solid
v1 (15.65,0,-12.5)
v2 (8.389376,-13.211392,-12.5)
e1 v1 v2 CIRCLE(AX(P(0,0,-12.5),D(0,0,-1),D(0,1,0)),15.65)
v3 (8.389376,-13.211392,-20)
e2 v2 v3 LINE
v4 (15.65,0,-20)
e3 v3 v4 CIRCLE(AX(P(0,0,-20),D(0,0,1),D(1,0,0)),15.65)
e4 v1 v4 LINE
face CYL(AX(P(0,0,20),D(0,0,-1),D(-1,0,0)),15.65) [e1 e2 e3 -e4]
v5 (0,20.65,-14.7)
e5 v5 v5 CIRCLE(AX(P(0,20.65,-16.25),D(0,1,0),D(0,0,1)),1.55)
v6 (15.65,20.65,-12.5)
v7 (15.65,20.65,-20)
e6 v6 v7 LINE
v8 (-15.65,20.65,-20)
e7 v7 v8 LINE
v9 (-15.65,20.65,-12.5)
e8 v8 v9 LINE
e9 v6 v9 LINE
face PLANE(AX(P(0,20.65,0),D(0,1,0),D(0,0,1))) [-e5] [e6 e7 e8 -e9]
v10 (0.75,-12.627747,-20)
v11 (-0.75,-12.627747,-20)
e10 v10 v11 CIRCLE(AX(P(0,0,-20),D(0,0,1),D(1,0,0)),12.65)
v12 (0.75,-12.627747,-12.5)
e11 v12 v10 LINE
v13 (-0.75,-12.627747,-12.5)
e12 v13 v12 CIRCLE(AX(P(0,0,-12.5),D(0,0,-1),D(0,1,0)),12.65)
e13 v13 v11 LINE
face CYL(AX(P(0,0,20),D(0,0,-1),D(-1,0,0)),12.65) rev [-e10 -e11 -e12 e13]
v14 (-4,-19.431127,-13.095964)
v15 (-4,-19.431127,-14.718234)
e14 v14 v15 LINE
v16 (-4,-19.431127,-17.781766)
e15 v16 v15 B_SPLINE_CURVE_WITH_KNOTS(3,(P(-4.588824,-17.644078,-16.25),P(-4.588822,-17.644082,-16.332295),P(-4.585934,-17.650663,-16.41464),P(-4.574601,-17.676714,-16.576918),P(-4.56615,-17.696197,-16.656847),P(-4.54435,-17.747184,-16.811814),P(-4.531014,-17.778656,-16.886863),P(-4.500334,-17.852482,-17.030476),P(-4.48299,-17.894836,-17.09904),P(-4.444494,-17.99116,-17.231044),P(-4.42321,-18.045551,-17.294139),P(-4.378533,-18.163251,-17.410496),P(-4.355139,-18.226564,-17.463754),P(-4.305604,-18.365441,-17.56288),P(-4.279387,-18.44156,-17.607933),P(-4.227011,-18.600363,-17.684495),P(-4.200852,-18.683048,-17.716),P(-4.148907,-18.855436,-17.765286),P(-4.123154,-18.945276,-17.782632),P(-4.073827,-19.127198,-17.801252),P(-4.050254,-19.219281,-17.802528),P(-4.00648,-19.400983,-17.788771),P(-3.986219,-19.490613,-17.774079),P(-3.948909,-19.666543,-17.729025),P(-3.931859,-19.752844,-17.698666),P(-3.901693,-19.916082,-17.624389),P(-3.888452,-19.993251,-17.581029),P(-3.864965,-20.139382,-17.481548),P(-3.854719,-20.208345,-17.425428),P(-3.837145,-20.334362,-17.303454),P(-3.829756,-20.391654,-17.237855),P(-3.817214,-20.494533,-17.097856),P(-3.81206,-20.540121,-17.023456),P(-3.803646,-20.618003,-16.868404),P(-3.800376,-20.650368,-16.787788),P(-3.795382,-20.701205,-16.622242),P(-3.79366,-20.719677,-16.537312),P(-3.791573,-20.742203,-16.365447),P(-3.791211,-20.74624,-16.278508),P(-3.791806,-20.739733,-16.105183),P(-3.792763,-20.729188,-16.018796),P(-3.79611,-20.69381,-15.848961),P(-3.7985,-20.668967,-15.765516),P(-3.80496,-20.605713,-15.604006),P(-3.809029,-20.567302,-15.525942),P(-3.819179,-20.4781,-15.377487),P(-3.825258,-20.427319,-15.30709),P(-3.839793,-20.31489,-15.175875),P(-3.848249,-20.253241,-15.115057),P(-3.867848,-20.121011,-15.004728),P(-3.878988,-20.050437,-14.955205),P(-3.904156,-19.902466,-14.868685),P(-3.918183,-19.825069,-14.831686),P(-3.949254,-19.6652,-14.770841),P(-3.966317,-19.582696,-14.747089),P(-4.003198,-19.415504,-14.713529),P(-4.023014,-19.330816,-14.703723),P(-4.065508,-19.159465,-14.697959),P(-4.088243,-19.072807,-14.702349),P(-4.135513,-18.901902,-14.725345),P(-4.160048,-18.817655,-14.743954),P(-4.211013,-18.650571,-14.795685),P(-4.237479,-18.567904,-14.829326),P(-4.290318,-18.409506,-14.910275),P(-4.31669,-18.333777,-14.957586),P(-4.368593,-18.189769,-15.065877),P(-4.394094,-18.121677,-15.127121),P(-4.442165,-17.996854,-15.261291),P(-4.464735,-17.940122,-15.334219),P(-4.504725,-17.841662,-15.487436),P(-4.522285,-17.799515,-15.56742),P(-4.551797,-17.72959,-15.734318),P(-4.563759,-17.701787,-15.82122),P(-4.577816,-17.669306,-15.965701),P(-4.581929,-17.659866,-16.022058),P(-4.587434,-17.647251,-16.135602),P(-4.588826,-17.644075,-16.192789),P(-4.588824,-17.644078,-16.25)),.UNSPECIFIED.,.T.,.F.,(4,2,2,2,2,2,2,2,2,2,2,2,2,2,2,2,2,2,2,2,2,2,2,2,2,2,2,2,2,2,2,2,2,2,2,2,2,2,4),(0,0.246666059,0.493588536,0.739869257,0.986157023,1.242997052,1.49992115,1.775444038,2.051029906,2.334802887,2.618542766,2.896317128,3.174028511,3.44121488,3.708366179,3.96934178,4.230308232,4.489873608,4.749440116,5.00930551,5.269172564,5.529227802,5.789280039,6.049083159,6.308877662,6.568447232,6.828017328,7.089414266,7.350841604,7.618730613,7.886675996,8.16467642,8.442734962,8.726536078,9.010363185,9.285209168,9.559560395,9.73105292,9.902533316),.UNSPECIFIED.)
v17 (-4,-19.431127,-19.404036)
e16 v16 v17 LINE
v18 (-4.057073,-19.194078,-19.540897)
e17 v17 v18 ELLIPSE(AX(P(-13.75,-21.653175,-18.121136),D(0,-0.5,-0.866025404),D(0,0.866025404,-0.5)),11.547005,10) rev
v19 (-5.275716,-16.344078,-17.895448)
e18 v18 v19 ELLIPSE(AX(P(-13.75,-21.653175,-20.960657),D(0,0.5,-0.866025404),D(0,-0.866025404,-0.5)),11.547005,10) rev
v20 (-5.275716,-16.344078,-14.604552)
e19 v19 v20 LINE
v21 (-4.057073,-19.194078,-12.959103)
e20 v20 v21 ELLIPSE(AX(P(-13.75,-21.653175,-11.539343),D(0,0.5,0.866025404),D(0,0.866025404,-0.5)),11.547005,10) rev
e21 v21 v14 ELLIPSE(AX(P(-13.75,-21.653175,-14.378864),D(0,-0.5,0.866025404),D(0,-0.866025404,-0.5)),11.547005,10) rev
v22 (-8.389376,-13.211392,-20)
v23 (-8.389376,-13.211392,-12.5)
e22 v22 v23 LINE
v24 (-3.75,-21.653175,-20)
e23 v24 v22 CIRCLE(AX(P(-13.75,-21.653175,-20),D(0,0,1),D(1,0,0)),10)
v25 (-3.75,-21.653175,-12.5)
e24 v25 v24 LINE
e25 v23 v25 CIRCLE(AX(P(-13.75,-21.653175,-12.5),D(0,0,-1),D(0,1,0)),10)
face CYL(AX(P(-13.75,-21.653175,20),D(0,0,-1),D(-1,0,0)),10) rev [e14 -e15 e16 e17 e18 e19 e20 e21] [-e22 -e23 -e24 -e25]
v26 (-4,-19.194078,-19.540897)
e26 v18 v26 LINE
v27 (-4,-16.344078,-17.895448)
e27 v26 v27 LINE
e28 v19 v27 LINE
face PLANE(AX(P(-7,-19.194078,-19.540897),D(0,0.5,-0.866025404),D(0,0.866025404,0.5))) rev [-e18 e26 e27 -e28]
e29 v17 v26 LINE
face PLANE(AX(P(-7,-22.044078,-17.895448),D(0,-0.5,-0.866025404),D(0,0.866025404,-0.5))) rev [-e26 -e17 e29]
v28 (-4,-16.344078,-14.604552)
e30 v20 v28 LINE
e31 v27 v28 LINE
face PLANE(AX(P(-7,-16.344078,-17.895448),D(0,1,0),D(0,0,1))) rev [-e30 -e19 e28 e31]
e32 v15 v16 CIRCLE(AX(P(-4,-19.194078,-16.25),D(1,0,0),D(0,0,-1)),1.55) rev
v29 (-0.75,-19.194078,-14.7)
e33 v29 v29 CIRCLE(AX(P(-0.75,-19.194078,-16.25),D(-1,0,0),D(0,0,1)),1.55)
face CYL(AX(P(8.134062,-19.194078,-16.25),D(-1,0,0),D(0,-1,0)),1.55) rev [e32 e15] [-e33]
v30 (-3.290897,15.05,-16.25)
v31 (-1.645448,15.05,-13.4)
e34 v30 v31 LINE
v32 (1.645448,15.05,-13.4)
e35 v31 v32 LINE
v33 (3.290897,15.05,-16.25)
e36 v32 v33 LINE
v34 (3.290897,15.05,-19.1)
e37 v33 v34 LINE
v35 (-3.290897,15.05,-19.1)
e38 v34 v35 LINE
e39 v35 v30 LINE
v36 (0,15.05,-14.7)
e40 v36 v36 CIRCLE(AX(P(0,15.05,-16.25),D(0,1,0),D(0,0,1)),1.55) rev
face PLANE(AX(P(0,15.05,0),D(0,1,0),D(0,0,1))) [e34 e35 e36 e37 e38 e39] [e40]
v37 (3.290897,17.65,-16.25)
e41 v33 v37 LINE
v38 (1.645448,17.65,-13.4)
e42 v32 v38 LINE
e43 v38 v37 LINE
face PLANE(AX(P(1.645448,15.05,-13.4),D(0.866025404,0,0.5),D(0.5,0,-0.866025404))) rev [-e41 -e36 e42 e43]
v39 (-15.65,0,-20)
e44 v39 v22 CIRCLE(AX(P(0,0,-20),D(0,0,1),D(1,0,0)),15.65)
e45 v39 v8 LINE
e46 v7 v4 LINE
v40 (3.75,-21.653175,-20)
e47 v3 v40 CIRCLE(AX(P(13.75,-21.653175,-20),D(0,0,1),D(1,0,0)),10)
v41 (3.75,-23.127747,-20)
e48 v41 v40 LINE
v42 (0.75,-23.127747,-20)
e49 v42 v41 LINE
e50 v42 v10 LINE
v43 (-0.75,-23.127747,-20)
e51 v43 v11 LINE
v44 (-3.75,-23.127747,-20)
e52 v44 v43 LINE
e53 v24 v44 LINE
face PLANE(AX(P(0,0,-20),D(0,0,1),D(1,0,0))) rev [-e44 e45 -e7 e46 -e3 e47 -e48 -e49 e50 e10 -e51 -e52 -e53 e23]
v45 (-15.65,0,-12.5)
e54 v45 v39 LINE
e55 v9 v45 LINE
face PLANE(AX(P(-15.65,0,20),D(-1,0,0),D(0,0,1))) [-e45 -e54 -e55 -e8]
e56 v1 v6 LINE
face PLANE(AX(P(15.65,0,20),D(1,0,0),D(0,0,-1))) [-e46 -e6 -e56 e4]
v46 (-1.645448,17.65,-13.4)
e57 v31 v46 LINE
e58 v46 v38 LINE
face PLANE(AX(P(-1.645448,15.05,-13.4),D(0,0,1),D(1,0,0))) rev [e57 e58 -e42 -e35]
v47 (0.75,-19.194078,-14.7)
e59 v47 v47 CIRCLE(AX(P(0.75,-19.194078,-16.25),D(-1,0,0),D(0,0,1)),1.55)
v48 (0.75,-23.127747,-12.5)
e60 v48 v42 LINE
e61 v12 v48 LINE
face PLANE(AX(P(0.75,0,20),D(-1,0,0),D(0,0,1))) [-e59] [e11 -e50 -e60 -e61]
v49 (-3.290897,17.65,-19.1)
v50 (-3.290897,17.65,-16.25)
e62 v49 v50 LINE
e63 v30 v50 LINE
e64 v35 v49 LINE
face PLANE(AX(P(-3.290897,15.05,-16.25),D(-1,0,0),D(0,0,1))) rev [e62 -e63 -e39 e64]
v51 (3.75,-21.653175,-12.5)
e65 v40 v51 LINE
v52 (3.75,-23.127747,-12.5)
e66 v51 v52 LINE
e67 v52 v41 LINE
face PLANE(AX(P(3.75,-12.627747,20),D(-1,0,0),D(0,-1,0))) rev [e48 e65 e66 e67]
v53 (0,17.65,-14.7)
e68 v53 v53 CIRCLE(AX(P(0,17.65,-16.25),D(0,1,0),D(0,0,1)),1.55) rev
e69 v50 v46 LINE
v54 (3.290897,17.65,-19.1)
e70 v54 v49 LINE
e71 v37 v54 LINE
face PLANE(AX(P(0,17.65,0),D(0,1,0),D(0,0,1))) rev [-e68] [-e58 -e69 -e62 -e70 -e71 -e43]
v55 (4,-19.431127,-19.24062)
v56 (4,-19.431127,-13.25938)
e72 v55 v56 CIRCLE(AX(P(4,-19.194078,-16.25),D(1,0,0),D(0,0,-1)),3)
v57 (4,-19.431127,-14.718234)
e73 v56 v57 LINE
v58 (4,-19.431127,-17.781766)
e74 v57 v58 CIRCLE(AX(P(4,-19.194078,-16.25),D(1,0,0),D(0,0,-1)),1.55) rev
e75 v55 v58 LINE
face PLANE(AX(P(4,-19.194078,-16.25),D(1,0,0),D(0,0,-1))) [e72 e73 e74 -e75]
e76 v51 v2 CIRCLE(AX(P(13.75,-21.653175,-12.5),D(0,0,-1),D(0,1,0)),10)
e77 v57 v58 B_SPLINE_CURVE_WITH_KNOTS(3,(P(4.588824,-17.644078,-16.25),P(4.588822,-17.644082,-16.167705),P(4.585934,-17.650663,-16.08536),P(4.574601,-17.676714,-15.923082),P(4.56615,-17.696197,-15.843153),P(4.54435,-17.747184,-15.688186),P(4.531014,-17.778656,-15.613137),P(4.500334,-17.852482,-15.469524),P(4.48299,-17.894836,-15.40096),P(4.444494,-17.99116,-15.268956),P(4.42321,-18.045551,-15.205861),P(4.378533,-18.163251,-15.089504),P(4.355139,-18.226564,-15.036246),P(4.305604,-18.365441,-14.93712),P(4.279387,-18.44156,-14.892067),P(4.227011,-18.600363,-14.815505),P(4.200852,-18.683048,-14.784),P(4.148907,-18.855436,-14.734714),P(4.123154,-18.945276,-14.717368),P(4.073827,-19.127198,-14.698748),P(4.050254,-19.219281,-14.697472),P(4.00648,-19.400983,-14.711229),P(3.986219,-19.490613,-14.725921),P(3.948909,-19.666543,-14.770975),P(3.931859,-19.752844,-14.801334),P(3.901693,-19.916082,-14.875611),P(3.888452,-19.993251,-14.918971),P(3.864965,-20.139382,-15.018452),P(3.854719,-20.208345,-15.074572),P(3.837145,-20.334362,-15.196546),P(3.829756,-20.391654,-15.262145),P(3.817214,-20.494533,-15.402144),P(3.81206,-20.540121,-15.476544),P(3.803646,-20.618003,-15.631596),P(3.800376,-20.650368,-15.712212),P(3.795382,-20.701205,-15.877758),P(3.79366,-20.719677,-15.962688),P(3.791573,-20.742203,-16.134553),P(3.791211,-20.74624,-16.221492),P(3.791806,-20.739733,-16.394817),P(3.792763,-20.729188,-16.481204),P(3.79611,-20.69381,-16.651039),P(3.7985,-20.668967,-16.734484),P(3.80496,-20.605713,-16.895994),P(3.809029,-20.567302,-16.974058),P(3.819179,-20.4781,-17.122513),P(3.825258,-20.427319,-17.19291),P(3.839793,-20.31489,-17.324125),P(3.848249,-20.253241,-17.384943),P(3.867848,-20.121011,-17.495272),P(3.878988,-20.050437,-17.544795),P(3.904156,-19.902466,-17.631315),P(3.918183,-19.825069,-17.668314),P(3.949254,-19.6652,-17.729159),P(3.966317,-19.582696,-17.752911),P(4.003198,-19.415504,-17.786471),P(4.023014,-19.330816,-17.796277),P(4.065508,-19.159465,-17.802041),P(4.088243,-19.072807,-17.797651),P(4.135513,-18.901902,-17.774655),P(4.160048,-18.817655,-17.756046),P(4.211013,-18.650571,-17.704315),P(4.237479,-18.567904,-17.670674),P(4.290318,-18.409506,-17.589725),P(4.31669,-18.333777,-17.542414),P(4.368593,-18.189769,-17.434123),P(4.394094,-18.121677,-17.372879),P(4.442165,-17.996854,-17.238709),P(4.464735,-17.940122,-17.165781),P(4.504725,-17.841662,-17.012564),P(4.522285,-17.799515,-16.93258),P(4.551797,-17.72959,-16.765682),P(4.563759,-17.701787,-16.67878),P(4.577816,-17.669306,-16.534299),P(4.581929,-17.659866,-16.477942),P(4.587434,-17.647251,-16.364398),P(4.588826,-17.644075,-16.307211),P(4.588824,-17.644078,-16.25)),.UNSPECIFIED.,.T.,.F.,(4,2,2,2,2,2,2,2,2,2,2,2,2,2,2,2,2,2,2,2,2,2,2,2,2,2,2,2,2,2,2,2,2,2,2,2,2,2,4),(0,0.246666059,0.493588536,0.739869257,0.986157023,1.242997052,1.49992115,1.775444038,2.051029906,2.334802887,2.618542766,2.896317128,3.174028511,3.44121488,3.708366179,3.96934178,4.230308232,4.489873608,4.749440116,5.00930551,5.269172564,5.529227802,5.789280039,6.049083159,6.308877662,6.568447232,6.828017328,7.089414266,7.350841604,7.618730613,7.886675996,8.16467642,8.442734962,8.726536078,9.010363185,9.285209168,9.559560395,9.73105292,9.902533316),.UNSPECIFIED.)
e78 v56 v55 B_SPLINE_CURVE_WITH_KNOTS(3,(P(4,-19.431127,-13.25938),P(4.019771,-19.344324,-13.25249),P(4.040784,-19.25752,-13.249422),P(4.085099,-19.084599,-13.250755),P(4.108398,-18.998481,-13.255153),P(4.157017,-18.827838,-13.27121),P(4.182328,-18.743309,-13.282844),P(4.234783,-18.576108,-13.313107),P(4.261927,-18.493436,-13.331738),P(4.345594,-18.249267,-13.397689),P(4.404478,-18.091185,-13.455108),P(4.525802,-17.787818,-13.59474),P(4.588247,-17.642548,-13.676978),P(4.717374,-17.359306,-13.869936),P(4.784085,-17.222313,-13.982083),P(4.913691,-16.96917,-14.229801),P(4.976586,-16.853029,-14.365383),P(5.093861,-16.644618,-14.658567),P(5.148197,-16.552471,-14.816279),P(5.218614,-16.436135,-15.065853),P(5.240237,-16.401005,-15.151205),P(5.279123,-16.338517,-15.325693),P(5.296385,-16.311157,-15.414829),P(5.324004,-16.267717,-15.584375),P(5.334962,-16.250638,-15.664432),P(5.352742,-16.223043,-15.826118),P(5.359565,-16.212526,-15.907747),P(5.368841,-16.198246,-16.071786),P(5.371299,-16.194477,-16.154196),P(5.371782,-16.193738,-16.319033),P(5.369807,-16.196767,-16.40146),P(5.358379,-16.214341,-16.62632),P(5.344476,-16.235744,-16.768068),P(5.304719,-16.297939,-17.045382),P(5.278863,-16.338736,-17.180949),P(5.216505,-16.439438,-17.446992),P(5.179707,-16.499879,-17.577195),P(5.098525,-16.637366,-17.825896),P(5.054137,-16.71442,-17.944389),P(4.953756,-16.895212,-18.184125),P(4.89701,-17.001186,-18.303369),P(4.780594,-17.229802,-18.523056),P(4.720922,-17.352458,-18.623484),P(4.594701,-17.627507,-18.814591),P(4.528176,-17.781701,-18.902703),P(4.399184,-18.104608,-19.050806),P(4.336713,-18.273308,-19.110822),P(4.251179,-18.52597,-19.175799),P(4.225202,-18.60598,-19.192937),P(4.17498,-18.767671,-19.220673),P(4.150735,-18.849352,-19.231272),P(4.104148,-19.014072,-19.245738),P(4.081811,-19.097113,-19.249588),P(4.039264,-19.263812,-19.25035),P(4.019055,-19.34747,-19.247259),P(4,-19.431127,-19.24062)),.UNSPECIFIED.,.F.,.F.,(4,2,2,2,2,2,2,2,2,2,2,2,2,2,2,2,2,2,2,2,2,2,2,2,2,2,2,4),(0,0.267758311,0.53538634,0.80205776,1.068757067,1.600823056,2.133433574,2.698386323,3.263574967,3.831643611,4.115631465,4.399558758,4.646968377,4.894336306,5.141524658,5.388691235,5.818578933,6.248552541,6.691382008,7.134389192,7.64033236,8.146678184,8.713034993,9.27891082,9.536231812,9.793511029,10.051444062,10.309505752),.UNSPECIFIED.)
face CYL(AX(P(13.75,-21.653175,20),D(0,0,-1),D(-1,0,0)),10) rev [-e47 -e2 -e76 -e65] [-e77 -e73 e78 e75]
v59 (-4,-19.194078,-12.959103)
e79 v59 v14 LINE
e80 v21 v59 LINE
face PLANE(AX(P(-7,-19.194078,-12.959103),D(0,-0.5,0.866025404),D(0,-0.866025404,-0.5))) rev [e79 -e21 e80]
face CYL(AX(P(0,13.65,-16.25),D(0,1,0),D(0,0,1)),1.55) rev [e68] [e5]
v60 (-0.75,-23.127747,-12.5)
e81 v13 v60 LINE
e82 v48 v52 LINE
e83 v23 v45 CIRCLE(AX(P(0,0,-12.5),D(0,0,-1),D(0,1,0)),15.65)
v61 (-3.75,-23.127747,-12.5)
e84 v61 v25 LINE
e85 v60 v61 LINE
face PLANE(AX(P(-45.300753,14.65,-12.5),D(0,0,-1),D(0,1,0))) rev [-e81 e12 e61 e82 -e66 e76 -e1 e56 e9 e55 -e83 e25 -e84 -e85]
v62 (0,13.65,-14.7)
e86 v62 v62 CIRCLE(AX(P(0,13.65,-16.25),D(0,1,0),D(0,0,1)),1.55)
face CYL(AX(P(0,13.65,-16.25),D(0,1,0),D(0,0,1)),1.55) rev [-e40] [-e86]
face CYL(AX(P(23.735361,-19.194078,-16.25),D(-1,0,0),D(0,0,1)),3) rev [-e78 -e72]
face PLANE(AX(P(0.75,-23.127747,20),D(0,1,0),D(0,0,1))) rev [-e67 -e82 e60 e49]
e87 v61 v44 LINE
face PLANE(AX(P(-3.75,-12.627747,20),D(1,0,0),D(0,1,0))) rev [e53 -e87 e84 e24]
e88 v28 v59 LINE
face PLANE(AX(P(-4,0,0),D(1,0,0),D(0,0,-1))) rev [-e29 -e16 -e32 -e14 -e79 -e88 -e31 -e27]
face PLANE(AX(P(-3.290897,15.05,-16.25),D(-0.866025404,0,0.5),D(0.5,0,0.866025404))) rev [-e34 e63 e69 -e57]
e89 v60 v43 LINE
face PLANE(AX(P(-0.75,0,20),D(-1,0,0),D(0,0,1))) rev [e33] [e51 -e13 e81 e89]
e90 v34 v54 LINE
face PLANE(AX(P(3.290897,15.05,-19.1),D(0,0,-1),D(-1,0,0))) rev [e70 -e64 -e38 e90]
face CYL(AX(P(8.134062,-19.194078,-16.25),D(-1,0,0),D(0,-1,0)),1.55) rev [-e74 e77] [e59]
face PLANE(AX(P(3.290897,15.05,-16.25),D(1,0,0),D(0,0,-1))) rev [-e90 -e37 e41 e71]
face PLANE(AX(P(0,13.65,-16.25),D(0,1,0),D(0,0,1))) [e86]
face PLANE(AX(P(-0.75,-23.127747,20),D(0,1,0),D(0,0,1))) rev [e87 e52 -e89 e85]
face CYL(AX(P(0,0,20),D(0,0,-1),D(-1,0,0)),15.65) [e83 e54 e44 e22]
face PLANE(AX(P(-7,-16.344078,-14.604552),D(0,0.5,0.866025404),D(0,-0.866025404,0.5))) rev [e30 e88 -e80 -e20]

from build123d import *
from build123d.topology import SkipClean

# Parameters (mm, degrees)
BOSS_EXTRUDE1_DEPTH   = 20
SKETCH2_W             = 3
SKETCH2_H             = 10.5
BOSS_EXTRUDE2_DEPTH   = 20
SKETCH4_W             = 31.3
SKETCH4_H             = 40
BOSS_EXTRUDE3_DEPTH   = 5
SKETCH5_W             = 25
SKETCH5_H             = 37.777747226
CUT_EXTRUDE2_DEPTH    = 13.65
SKETCH6_R             = 1.55
MOTORMOUNTHOLES_DEPTH = 6
CLAMPHOLES_REACH      = 38.211
SKETCH8_R             = 1.55
ENDSTOPPER_DEPTH      = 2
CUT_EXTRUDE7_START    = -15.65
SKETCH10_W            = 25
SKETCH10_H            = 37.777747226
CUT_EXTRUDE7_DEPTH    = 13.65
SKETCH11_W            = 25
SKETCH11_H            = 10.636850541
CUT_EXTRUDE8_DEPTH    = 4
FILLET1_START         = -20
FILLET1_DEPTH         = 2.1999999
FILLET1_START_2       = -14.6999999
FILLET1_2_DEPTH       = 2.1999999
FILLET1_START_3       = 12.5
FILLET1_3_DEPTH       = 2.1999999
FILLET1_START_4       = 17.8000001
FILLET1_4_DEPTH       = 2.1999999
FILLET1_START_5       = -17.8000001
FILLET1_5_DEPTH       = 3.1000002
FILLET1_START_6       = 14.6999999
FILLET1_6_DEPTH       = 3.1000002
FILLET1_START_7       = -8.389376218
FILLET1_7_OUTLINE_R   = 1.55
FILLET1_7_DEPTH       = 16.778752436
SKETCH13_W            = 10
SKETCH13_H            = 10
CUT_EXTRUDE10_REACH   = 40.348
CUT_EXTRUDE10_START   = 4
SKETCH15_R            = 3
CUT_EXTRUDE11_START   = -4
CUT_EXTRUDE11_DEPTH   = 3
SKETCH17_R            = 6
SHAFT_CLEARANCE_DEPTH = 0.4
SKETCH18_W            = 60.470736223
SKETCH18_H            = 67.356637863
CUT_EXTRUDE12_DEPTH   = 25
SKETCH19_R            = 1.55
CUT_EXTRUDE13_DEPTH   = 7
CUT_EXTRUDE14_START   = -3
CUT_EXTRUDE14_DEPTH   = 2.6


with BuildPart() as part:
    # Sketch1 → Boss-Extrude1 (new, symmetric)
    with BuildSketch(Plane.XY):
        with BuildLine():
            Line((-15.65, 15.65), (-15.65, 0))
            ThreePointArc((-15.65, 0), (-11.066221106, 11.066221145), (5.4e-08, 15.65))
            Line((5.4e-08, 15.65), (-15.65, 15.65))
        make_face()
        with BuildLine():
            Line((15.65, 15.65), (5.4e-08, 15.65))
            ThreePointArc((5.4e-08, 15.65), (11.066221145, 11.066221106), (15.65, 0))
            Line((15.65, 0), (15.65, 15.65))
        make_face()
        with BuildLine():
            ThreePointArc((5.4e-08, 15.65), (-11.066221106, 11.066221145), (-15.65, 0))
            ThreePointArc((-15.65, 0), (-11.328283189, -10.797800702), (-0.75, -15.632018424))
            Line((-0.75, -15.632018424), (-0.75, -12.627747226))
            ThreePointArc((-0.75, -12.627747226), (-8.675684411, 9.206247878), (12.65, 0))
            ThreePointArc((12.65, 0), (9.206247878, -8.675684411), (0.75, -12.627747226))
            Line((0.75, -12.627747226), (0.75, -15.632018424))
            ThreePointArc((0.75, -15.632018424), (11.328283189, -10.797800702), (15.65, 0))
            ThreePointArc((15.65, 0), (11.066221145, 11.066221106), (5.4e-08, 15.65))
        make_face()
    extrude(amount=BOSS_EXTRUDE1_DEPTH, both=True)

    # Sketch2 → Boss-Extrude2 (add, symmetric)
    with BuildSketch(Plane.XY):
        with Locations((-2.25, -17.877747226)):
            Rectangle(SKETCH2_W, SKETCH2_H)
        with Locations((2.25, -17.877747226)):
            Rectangle(SKETCH2_W, SKETCH2_H)
    extrude(amount=BOSS_EXTRUDE2_DEPTH, both=True)

    # Sketch4 → Boss-Extrude3 (add)
    with BuildSketch(Plane(origin=(0, 15.65, 0), x_dir=(1, 0, 0), z_dir=(0, 1, 0))):
        Rectangle(SKETCH4_W, SKETCH4_H)
    extrude(amount=BOSS_EXTRUDE3_DEPTH)

    # Sketch5 → Cut-Extrude2 (cut)
    with BuildSketch(Plane(origin=(15.65, 0, 0), x_dir=(0, 0, -1), z_dir=(1, 0, 0))):
        with Locations((0, -4.238873613)):
            Rectangle(SKETCH5_W, SKETCH5_H)
    extrude(amount=-CUT_EXTRUDE2_DEPTH, mode=Mode.SUBTRACT)

    # Sketch6 → MotorMountHoles (cut)
    with BuildSketch(Plane(origin=(0, 20.65, 0), x_dir=(1, 0, 0), z_dir=(0, 1, 0))):
        with Locations(Location((-8.838834765, 8.838834765, 0), (0, 0, 270))):
            Circle(SKETCH6_R)
        with Locations(Location((8.838834765, 8.838834765, 0), (0, 0, 270))):
            Circle(SKETCH6_R)
        with Locations(Location((8.838834765, -8.838834765, 0), (0, 0, 270))):
            Circle(SKETCH6_R)
        with Locations(Location((-8.838834765, -8.838834765, 0), (0, 0, 270))):
            Circle(SKETCH6_R)
    extrude(amount=-MOTORMOUNTHOLES_DEPTH, mode=Mode.SUBTRACT)

    # ClampHoles: up to this face of the body (flat: up to its plane)
    clampholes_end = Plane(part.part.faces().sort_by_distance((3.75, -19.16091251, 16.25))[0])
    # Sketch8 → ClampHoles (cut, up to the picked face)
    with BuildSketch(Plane.ZY.offset(3.75), mode=Mode.PRIVATE) as clampholes_sk1:
        with Locations(Location((16.25, -19.194077794, 0), (0, 0, 270))):
            Circle(SKETCH8_R)
    clampholes_tool1 = split(extrude(clampholes_sk1.sketch, amount=-CLAMPHOLES_REACH, mode=Mode.PRIVATE), bisect_by=clampholes_end, keep=Keep.BOTH, mode=Mode.PRIVATE)
    # Sketch8 → ClampHoles (cut, up to the picked face)
    with BuildSketch(Plane.ZY.offset(3.75), mode=Mode.PRIVATE) as clampholes_sk2:
        with Locations(Location((-16.25, -19.194077794, 0), (0, 0, 270))):
            Circle(SKETCH8_R)
    clampholes_tool2 = split(extrude(clampholes_sk2.sketch, amount=-CLAMPHOLES_REACH, mode=Mode.PRIVATE), bisect_by=clampholes_end, keep=Keep.BOTH, mode=Mode.PRIVATE)
    add(clampholes_tool1.solids().sort_by(Axis((-3.75, -19.194078, 16.25), (1, 0, 0)))[0], mode=Mode.SUBTRACT)
    add(clampholes_tool2.solids().sort_by(Axis((-3.75, -19.194078, -16.25), (1, 0, 0)))[0], mode=Mode.SUBTRACT)

    # Sketch9 → EndStopper (add)
    with BuildSketch(Plane.XY.offset(20)):
        with BuildLine():
            ThreePointArc((12.65, 0), (-8.675684411, 9.206247878), (-0.75, -12.627747226))
            Line((-0.75, -12.627747226), (-0.75, -7.964766161))
            ThreePointArc((-0.75, -7.964766161), (-5.385164807, 5.916079783), (8, 0))
            ThreePointArc((8, 0), (5.916079783, -5.385164807), (0.75, -7.964766161))
            Line((0.75, -7.964766161), (0.75, -12.627747226))
            ThreePointArc((0.75, -12.627747226), (9.206247878, -8.675684411), (12.65, 0))
        make_face()
    extrude(amount=-ENDSTOPPER_DEPTH)

    # Sketch10 → Cut-Extrude7 (cut)
    with BuildSketch(Plane(origin=(0, 0, 0), x_dir=(0, 0, -1), z_dir=(1, 0, 0)).offset(CUT_EXTRUDE7_START)):
        with Locations((0, -4.238873613)):
            Rectangle(SKETCH10_W, SKETCH10_H)
    extrude(amount=CUT_EXTRUDE7_DEPTH, mode=Mode.SUBTRACT)

    # Sketch11 → Cut-Extrude8 (cut)
    with BuildSketch(Plane.ZY.offset(2)):
        with Locations((0, -17.809321955)):
            Rectangle(SKETCH11_W, SKETCH11_H)
    extrude(amount=-CUT_EXTRUDE8_DEPTH, mode=Mode.SUBTRACT)

    # Fillet1: read off the stored shape, not the designer's step
    # Fillet1 outline → Fillet1 (add)
    with BuildSketch(Plane.XY.offset(FILLET1_START)):
        with BuildLine():
            Line((3.75, -15.194077794), (3.75, -21.653175287))
            ThreePointArc((3.75, -21.653175287), (4.986261134, -16.83686123), (8.389376218, -13.211391549))
            ThreePointArc((8.389376218, -13.211391549), (6.150111782, -14.39092162), (3.75, -15.194077794))
        make_face()
        with BuildLine():
            ThreePointArc((-3.75, -15.194077794), (-6.150111782, -14.39092162), (-8.389376218, -13.21139155))
            ThreePointArc((-8.389376218, -13.21139155), (-4.986261134, -16.83686123), (-3.75, -21.653175287))
            Line((-3.75, -21.653175287), (-3.75, -15.194077794))
        make_face()
    extrude(amount=FILLET1_DEPTH)

    # Fillet1 2 outline → Fillet1 2 (add)
    with BuildSketch(Plane.XY.offset(FILLET1_START_2)):
        with BuildLine():
            Line((3.75, -15.194077794), (3.75, -21.653175287))
            ThreePointArc((3.75, -21.653175287), (4.986261134, -16.83686123), (8.389376218, -13.211391549))
            ThreePointArc((8.389376218, -13.211391549), (6.150111782, -14.39092162), (3.75, -15.194077794))
        make_face()
        with BuildLine():
            ThreePointArc((-3.75, -15.194077794), (-6.150111782, -14.39092162), (-8.389376218, -13.21139155))
            ThreePointArc((-8.389376218, -13.21139155), (-4.986261134, -16.83686123), (-3.75, -21.653175287))
            Line((-3.75, -21.653175287), (-3.75, -15.194077794))
        make_face()
    extrude(amount=FILLET1_2_DEPTH)

    # Fillet1 3 outline → Fillet1 3 (add)
    with BuildSketch(Plane.XY.offset(FILLET1_START_3)):
        with BuildLine():
            Line((3.75, -15.194077794), (3.75, -21.653175287))
            ThreePointArc((3.75, -21.653175287), (4.986261134, -16.83686123), (8.389376218, -13.211391549))
            ThreePointArc((8.389376218, -13.211391549), (6.150111782, -14.39092162), (3.75, -15.194077794))
        make_face()
        with BuildLine():
            ThreePointArc((-3.75, -15.194077794), (-6.150111782, -14.39092162), (-8.389376218, -13.21139155))
            ThreePointArc((-8.389376218, -13.21139155), (-4.986261134, -16.83686123), (-3.75, -21.653175287))
            Line((-3.75, -21.653175287), (-3.75, -15.194077794))
        make_face()
    extrude(amount=FILLET1_3_DEPTH)

    # Fillet1 4 outline → Fillet1 4 (add)
    with BuildSketch(Plane.XY.offset(FILLET1_START_4)):
        with BuildLine():
            Line((3.75, -15.194077794), (3.75, -21.653175287))
            ThreePointArc((3.75, -21.653175287), (4.986261134, -16.83686123), (8.389376218, -13.211391549))
            ThreePointArc((8.389376218, -13.211391549), (6.150111782, -14.39092162), (3.75, -15.194077794))
        make_face()
        with BuildLine():
            ThreePointArc((-3.75, -15.194077794), (-6.150111782, -14.39092162), (-8.389376218, -13.21139155))
            ThreePointArc((-8.389376218, -13.21139155), (-4.986261134, -16.83686123), (-3.75, -21.653175287))
            Line((-3.75, -21.653175287), (-3.75, -15.194077794))
        make_face()
    extrude(amount=FILLET1_4_DEPTH)

    # Fillet1 5 outline → Fillet1 5 (add)
    with BuildSketch(Plane.XY.offset(FILLET1_START_5)):
        with BuildLine():
            Line((3.75, -15.194077794), (3.75, -21.653175287))
            ThreePointArc((3.75, -21.653175287), (4.986261134, -16.83686123), (8.389376218, -13.211391549))
            ThreePointArc((8.389376218, -13.211391549), (6.150111782, -14.39092162), (3.75, -15.194077794))
        make_face()
        with BuildLine():
            ThreePointArc((-3.75, -15.194077794), (-6.150111782, -14.39092162), (-8.389376218, -13.21139155))
            ThreePointArc((-8.389376218, -13.21139155), (-4.986261134, -16.83686123), (-3.75, -21.653175287))
            Line((-3.75, -21.653175287), (-3.75, -15.194077794))
        make_face()
    extrude(amount=FILLET1_5_DEPTH)

    # Fillet1 6 outline → Fillet1 6 (add)
    with BuildSketch(Plane.XY.offset(FILLET1_START_6)):
        with BuildLine():
            Line((3.75, -15.194077794), (3.75, -21.653175287))
            ThreePointArc((3.75, -21.653175287), (4.986261134, -16.83686123), (8.389376218, -13.211391549))
            ThreePointArc((8.389376218, -13.211391549), (6.150111782, -14.39092162), (3.75, -15.194077794))
        make_face()
        with BuildLine():
            ThreePointArc((-3.75, -15.194077794), (-6.150111782, -14.39092162), (-8.389376218, -13.21139155))
            ThreePointArc((-8.389376218, -13.21139155), (-4.986261134, -16.83686123), (-3.75, -21.653175287))
            Line((-3.75, -21.653175287), (-3.75, -15.194077794))
        make_face()
    extrude(amount=FILLET1_6_DEPTH)

    # Fillet1 7 outline → Fillet1 7 (cut)
    with BuildSketch(Plane.YZ.offset(FILLET1_START_7)):
        with Locations((-19.194077794, -16.25)):
            Circle(FILLET1_7_OUTLINE_R)
        with Locations((-19.194077794, 16.25)):
            Circle(FILLET1_7_OUTLINE_R)
    extrude(amount=FILLET1_7_DEPTH, mode=Mode.SUBTRACT)

    # Cut-Sweep1: sweep along a path in Sketch12
    with BuildLine(Plane(origin=(0, 0, 0), x_dir=(0, 0, -1), z_dir=(1, 0, 0))) as cut_sweep1_path:
        Line((-2.775739564, 34.353299637), (-30.459033802, 12.328988213))
    # Sketch13 → Cut-Sweep1 (sweep, cut)
    with BuildSketch(Plane(origin=(0, 11.963370534, -15.037269505), x_dir=(-1, 0, 0), z_dir=(0, 0.6225843191548198, -0.7825527238100508))):
        with Locations((0, 29.484397462)):
            Rectangle(SKETCH13_W, SKETCH13_H)
    sweep(path=cut_sweep1_path.line, mode=Mode.SUBTRACT)

    # Sketch15 → Cut-Extrude10 (cut, up to next)
    with BuildSketch(Plane(origin=(0, 0, 0), x_dir=(0, 0, -1), z_dir=(1, 0, 0)).offset(CUT_EXTRUDE10_START), mode=Mode.PRIVATE) as cut_extrude10_sk1:
        with Locations((16.25, -19.194077794)):
            Circle(SKETCH15_R)
    cut_extrude10_tool1 = extrude(cut_extrude10_sk1.sketch, amount=CUT_EXTRUDE10_REACH, mode=Mode.PRIVATE) & part.part
    cut_extrude10 = cut_extrude10_tool1.solids().sort_by_distance((4, -19.194078, -16.25))[0]
    add(cut_extrude10, mode=Mode.SUBTRACT)

    # Sketch16 → Cut-Extrude11 (cut)
    with BuildSketch(Plane(origin=(0, 0, 0), x_dir=(0, 0, -1), z_dir=(1, 0, 0)).offset(CUT_EXTRUDE11_START)):
        Polygon((12.959103466, -19.194077794), (14.604551733, -22.044077794), (17.895448267, -22.044077794), (19.540896534, -19.194077794), (17.895448267, -16.344077794), (14.604551733, -16.344077794), align=None)
    cut_extrude11 = extrude(amount=-CUT_EXTRUDE11_DEPTH, mode=Mode.SUBTRACT)

    # Mirror1: Cut-Extrude10, Cut-Extrude11 across plane
    add(cut_extrude10.mirror(Plane.XY), mode=Mode.SUBTRACT)
    add(cut_extrude11.mirror(Plane.XY), mode=Mode.SUBTRACT)

    # Sketch17 → Shaft Clearance (cut)
    with BuildSketch(Plane(origin=(0, 20.65, 0), x_dir=(1, 0, 0), z_dir=(0, 1, 0))):
        with Locations(Location((0, 0, 0), (0, 0, 270))):
            Circle(SKETCH17_R)
    extrude(amount=-SHAFT_CLEARANCE_DEPTH, mode=Mode.SUBTRACT)

    # Sketch18 → Cut-Extrude12 (cut, symmetric)
    with SkipClean():  # the faces are left unmerged after this step: merging them gives an invalid solid
        with BuildSketch(Plane(origin=(0, 0, 0), x_dir=(0, 0, -1), z_dir=(1, 0, 0))):
            with Locations((-17.735368112, 5.054402567)):
                Rectangle(SKETCH18_W, SKETCH18_H)
        extrude(amount=CUT_EXTRUDE12_DEPTH, both=True, mode=Mode.SUBTRACT)

    # Sketch19 → Cut-Extrude13 (cut)
    with SkipClean():  # the faces are left unmerged after this step: merging them gives an invalid solid
        with BuildSketch(Plane(origin=(0, 20.65, 0), x_dir=(1, 0, 0), z_dir=(0, 1, 0))):
            with Locations(Location((0, 16.25, 0), (0, 0, 270))):
                Circle(SKETCH19_R)
        extrude(amount=-CUT_EXTRUDE13_DEPTH, mode=Mode.SUBTRACT)

    # Sketch20 → Cut-Extrude14 (cut)
    with SkipClean():  # the faces are left unmerged after this step: merging them gives an invalid solid
        with BuildSketch(Plane(origin=(0, 20.65, 0), x_dir=(1, 0, 0), z_dir=(0, 1, 0)).offset(CUT_EXTRUDE14_START)):
            Polygon((-3.290896534, 16.25), (-1.645448267, 13.4), (1.645448267, 13.4), (3.290896534, 16.25), (3.290896534, 19.1), (-3.290896534, 19.1), align=None)
        extrude(amount=-CUT_EXTRUDE14_DEPTH, mode=Mode.SUBTRACT)


solid = part.part
